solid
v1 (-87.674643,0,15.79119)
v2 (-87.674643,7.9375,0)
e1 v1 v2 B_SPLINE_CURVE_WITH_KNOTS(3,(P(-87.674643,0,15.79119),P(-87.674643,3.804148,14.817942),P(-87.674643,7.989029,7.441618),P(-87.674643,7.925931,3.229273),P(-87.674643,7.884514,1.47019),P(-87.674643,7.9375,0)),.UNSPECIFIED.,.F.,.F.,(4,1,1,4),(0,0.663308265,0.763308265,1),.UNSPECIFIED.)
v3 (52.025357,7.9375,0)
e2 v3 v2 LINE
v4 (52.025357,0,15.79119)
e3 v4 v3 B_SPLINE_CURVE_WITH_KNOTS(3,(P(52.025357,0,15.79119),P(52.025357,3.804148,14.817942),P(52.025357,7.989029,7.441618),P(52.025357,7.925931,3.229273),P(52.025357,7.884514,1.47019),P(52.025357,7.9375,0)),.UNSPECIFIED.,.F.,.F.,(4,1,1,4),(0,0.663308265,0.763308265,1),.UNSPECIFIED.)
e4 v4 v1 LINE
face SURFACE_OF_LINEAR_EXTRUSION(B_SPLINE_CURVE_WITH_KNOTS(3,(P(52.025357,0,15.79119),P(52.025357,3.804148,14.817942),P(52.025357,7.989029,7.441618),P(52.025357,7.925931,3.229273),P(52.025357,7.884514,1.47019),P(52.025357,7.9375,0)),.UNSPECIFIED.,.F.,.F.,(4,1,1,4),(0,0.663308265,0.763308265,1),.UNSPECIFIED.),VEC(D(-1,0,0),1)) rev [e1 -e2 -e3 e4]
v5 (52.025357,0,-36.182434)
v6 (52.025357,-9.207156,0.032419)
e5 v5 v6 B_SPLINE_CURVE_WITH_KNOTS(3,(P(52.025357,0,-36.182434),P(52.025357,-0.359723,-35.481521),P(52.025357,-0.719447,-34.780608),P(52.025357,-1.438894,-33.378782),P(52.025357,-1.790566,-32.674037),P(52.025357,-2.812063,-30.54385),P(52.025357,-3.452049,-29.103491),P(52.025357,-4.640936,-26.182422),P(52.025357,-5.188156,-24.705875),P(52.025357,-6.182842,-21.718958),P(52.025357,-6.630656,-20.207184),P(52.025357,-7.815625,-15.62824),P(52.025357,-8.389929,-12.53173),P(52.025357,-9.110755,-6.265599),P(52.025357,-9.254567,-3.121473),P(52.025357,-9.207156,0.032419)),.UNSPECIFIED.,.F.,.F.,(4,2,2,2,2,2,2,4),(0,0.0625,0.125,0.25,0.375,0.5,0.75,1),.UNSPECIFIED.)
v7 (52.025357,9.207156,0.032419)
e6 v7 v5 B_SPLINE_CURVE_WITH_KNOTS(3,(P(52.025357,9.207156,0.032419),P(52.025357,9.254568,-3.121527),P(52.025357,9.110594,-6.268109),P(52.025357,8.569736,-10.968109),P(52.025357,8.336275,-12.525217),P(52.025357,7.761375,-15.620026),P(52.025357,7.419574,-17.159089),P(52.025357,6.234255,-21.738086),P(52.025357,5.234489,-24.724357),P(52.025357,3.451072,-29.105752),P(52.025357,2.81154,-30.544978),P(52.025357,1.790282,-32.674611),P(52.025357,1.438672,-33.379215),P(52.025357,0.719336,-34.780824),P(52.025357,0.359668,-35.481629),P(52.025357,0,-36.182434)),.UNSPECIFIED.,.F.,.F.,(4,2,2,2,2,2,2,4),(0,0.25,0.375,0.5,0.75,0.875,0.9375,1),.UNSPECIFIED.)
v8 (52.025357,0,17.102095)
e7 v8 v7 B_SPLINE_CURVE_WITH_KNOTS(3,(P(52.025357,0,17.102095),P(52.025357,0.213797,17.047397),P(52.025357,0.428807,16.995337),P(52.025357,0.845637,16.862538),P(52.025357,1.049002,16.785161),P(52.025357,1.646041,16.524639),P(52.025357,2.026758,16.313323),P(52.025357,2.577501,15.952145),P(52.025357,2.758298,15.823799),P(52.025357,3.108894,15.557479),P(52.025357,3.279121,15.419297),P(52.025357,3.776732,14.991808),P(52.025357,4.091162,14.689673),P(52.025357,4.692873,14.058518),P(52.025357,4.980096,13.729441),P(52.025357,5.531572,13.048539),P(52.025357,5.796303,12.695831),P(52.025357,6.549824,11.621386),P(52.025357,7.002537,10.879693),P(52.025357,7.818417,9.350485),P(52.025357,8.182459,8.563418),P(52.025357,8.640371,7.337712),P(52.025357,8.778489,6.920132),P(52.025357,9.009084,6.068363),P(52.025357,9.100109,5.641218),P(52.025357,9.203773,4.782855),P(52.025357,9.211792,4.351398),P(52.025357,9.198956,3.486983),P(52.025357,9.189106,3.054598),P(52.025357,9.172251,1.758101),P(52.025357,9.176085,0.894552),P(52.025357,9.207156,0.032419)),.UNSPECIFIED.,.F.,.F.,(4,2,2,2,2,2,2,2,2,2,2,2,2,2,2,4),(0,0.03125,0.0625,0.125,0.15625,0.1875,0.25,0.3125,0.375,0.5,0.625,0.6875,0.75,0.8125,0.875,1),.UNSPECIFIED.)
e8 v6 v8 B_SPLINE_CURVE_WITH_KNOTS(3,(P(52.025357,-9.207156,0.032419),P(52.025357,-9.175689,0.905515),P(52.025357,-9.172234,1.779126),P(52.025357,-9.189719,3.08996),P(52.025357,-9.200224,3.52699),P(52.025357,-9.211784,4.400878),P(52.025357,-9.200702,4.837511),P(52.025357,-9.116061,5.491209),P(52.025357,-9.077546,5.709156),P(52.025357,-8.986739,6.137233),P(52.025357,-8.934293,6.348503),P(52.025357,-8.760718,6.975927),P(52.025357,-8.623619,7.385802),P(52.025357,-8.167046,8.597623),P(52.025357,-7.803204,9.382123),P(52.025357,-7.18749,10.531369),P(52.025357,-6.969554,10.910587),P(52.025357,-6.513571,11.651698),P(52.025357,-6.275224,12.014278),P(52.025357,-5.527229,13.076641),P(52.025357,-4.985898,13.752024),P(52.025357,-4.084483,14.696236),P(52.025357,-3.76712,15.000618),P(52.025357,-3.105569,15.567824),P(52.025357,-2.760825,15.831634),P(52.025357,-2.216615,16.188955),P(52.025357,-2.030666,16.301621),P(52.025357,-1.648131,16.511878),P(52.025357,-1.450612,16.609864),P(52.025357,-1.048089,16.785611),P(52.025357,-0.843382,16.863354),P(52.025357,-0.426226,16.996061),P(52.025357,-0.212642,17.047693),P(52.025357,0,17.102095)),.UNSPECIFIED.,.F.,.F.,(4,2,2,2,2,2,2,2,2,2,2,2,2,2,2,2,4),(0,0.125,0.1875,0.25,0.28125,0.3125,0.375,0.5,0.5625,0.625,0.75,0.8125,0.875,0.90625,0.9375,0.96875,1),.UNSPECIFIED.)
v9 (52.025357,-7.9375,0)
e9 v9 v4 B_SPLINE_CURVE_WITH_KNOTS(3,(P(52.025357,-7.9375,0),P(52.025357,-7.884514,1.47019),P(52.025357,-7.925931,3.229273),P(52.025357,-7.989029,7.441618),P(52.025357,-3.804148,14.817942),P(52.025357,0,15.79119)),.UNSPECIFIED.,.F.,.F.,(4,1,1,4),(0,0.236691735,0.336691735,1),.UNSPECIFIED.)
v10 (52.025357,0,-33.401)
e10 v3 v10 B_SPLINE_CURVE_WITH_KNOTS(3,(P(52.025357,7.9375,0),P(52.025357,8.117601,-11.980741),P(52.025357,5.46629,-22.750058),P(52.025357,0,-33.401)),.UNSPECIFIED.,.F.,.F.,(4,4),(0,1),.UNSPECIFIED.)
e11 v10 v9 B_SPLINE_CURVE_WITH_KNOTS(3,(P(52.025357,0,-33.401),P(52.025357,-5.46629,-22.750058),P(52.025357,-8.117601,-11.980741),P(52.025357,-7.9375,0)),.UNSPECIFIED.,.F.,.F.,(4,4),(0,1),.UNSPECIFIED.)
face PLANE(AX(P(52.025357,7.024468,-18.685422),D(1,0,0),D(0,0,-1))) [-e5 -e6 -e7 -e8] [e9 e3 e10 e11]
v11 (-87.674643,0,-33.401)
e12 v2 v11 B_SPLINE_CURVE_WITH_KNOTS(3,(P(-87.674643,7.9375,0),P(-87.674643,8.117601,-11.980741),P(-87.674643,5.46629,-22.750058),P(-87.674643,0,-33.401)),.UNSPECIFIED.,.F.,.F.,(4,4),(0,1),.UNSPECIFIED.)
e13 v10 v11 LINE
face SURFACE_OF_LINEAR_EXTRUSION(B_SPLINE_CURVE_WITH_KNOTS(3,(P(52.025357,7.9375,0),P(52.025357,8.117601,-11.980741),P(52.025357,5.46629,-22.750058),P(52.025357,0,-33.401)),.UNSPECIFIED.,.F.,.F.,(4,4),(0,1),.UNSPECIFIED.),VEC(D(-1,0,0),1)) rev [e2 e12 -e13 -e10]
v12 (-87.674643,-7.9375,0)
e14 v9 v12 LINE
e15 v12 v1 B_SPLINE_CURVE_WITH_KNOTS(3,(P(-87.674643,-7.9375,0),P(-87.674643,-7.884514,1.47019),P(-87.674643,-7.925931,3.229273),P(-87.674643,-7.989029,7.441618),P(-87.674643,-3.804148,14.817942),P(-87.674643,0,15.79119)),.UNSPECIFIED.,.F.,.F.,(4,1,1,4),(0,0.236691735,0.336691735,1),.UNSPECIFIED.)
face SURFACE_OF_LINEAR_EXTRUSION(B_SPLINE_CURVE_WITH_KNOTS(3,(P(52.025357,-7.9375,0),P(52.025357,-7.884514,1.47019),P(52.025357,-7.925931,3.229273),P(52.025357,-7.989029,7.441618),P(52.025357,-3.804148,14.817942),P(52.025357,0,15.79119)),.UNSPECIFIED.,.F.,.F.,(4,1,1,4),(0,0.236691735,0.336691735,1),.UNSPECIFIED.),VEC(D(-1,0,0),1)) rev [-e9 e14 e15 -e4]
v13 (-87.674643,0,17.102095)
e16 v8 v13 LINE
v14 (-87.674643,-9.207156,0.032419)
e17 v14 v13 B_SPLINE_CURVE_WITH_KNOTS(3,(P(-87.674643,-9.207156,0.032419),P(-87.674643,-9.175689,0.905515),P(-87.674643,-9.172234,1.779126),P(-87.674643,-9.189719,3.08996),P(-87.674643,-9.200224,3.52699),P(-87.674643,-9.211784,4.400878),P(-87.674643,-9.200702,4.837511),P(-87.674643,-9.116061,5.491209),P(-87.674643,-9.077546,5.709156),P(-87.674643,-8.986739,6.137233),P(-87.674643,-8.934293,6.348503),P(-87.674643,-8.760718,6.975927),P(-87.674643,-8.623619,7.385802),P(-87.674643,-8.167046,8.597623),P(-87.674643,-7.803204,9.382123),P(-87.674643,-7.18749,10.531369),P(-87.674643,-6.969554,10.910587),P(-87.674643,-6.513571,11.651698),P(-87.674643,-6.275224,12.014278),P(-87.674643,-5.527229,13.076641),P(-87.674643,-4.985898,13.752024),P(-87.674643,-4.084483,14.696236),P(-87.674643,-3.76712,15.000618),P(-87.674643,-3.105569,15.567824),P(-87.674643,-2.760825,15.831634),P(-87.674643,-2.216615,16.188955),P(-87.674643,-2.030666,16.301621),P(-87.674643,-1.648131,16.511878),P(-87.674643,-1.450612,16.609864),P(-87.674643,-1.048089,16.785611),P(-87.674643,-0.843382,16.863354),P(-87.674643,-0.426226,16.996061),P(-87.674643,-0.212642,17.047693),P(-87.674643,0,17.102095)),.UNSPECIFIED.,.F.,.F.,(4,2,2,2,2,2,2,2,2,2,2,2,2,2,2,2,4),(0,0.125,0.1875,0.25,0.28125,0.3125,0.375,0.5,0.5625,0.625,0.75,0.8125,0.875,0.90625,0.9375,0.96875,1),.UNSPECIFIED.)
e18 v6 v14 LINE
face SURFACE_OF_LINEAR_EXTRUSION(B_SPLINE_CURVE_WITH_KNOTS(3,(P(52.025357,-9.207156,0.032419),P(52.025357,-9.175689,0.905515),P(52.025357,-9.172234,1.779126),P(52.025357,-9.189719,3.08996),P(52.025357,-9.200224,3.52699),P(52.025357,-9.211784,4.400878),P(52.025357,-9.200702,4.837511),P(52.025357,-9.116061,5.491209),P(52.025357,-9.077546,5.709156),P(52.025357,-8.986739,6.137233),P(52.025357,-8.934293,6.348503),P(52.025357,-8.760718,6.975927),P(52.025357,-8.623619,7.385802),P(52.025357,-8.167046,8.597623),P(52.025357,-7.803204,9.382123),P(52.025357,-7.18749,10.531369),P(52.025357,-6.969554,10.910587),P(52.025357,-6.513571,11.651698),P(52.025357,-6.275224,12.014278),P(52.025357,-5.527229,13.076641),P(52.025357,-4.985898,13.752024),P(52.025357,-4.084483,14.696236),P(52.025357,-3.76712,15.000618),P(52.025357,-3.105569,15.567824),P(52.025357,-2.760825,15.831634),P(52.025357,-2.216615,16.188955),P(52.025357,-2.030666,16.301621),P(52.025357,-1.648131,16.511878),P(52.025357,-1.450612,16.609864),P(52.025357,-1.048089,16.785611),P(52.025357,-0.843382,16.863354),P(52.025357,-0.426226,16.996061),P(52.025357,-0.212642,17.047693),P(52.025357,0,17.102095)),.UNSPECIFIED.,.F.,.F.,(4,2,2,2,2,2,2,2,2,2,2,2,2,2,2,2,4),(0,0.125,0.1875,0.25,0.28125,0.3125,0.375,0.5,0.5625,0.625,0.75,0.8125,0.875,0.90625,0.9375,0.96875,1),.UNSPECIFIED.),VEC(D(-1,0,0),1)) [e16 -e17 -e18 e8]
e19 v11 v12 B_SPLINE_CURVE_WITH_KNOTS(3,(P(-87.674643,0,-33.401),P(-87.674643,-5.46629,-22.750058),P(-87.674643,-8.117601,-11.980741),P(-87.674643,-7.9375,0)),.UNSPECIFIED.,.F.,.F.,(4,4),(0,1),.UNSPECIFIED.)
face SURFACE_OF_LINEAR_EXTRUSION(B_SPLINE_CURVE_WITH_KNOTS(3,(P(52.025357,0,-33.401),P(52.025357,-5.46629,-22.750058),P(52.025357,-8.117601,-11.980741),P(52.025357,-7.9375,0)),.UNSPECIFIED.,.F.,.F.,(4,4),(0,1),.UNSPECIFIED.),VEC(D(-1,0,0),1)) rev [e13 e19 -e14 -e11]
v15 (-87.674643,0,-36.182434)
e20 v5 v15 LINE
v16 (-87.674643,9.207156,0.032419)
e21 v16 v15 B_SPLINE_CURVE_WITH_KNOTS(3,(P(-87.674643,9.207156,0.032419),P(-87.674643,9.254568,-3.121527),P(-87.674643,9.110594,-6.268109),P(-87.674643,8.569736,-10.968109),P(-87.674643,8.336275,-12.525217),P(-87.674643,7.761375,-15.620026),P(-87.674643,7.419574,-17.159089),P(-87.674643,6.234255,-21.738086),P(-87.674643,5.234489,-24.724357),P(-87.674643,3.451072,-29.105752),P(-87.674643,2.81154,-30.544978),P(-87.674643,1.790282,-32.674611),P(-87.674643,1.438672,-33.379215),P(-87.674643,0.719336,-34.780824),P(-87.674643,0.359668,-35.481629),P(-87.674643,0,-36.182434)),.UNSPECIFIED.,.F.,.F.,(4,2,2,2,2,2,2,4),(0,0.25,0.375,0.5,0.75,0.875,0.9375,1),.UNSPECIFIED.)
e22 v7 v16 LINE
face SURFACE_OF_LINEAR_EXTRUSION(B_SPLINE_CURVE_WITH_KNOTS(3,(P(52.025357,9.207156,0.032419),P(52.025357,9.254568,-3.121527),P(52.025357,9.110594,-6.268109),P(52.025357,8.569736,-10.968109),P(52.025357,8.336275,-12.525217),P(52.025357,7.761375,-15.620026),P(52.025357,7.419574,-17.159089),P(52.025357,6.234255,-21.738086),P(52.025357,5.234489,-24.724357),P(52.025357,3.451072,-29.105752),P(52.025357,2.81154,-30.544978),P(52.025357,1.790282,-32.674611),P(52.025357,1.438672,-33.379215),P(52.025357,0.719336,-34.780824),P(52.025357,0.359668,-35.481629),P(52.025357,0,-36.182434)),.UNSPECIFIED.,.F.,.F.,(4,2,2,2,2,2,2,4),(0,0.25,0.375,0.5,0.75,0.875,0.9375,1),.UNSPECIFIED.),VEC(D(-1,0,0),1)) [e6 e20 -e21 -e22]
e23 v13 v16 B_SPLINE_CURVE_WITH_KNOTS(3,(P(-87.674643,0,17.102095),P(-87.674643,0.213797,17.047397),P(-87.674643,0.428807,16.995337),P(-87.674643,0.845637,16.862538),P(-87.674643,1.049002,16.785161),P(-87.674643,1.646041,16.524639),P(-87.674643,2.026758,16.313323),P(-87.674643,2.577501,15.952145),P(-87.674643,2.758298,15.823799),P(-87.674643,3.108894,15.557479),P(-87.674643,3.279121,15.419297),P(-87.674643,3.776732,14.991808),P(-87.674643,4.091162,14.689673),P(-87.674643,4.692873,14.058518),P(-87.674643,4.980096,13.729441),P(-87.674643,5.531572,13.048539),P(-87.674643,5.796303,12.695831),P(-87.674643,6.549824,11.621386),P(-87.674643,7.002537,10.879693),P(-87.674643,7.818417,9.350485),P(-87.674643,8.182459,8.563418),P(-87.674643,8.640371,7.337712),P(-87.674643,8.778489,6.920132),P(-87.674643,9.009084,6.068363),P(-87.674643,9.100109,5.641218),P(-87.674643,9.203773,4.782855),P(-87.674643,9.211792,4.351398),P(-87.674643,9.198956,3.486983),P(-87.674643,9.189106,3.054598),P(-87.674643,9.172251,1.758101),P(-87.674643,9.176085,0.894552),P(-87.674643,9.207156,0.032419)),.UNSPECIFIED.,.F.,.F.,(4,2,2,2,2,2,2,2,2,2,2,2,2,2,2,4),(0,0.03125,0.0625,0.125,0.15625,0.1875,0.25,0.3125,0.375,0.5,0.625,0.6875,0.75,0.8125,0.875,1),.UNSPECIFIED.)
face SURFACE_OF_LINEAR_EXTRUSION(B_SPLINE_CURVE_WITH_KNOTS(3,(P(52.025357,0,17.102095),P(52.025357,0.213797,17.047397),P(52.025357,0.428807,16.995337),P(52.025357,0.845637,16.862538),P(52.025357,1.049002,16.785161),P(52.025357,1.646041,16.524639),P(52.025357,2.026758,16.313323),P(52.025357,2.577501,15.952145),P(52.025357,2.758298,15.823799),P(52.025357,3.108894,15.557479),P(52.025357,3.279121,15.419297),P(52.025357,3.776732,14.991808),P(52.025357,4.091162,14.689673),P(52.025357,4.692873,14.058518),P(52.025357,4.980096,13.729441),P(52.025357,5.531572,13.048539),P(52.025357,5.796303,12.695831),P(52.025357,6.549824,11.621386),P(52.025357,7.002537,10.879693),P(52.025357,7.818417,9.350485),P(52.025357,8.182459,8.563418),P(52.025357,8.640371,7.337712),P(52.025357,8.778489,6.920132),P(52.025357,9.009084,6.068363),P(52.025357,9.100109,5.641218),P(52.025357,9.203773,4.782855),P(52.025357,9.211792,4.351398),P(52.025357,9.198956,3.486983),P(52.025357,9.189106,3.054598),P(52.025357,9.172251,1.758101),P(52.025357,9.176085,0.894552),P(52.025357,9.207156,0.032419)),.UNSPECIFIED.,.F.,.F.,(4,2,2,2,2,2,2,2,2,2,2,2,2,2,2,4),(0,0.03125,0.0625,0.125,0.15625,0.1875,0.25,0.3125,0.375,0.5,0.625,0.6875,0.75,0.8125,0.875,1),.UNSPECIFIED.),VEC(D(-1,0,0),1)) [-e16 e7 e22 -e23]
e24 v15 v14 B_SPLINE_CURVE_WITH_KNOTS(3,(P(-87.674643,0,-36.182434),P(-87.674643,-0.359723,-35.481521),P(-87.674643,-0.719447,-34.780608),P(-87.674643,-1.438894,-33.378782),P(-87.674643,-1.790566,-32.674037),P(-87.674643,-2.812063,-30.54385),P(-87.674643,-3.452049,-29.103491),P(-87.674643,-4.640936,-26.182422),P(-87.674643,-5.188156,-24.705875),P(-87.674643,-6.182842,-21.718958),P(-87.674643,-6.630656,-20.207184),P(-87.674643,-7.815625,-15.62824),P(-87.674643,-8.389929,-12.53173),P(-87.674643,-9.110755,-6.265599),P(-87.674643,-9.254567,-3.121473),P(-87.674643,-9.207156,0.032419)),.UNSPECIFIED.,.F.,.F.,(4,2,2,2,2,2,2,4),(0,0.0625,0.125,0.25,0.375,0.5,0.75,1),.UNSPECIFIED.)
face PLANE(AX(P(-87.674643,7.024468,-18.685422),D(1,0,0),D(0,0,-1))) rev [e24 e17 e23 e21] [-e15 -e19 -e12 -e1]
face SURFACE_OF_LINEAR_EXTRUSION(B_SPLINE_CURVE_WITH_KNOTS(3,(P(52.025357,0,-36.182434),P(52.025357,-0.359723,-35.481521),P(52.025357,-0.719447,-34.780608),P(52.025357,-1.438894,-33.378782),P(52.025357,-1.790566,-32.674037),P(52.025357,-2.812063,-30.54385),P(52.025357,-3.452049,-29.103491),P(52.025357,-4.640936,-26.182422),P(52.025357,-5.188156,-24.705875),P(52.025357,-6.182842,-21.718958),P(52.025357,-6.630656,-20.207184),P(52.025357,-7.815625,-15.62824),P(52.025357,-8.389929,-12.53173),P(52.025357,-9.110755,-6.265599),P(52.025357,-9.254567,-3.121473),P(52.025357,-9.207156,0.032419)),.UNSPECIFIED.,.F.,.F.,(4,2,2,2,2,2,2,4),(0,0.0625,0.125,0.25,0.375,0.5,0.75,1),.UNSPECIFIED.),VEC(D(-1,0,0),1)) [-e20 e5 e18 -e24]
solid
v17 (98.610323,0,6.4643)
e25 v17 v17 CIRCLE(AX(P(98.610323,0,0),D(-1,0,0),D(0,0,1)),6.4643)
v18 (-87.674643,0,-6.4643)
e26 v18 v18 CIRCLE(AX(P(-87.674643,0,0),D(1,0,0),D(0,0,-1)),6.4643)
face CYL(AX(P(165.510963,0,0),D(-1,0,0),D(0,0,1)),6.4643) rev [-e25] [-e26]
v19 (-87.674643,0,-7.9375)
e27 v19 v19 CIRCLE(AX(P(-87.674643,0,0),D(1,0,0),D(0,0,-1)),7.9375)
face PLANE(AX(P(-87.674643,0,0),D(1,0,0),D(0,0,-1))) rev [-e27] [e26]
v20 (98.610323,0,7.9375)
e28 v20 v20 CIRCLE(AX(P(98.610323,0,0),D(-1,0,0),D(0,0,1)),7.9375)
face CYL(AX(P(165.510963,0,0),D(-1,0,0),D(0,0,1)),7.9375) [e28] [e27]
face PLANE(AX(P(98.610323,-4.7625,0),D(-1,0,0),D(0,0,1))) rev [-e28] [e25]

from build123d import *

# Parameters (mm, degrees)
BOSS_EXTRUDE1_DEPTH      = 98.610323
BOSS_EXTRUDE1_DEPTH_BACK = 87.674643
SKETCH1_R                = 7.9375
SKETCH1_R_2              = 6.4643
EXTRUDE_THIN1_START      = -139.7
EXTRUDE_THIN1_DEPTH      = 139.7


# Read off the part's stored shape, not the designer's step: Extrude-Thin1
with BuildPart() as part:
    # Sketch1 → Boss-Extrude1 (new, two sides: drawn at the far end of the back side and taken through both)
    with BuildSketch(Plane(origin=(0, 0, 0), x_dir=(0, 0, -1), z_dir=(1, 0, 0)).offset(-BOSS_EXTRUDE1_DEPTH_BACK)):
        with Locations(Location((0, 0, 0), (0, 0, 180))):
            Circle(SKETCH1_R)
        with Locations(Location((0, 0, 0), (0, 0, 180))):
            Circle(SKETCH1_R_2, mode=Mode.SUBTRACT)
    extrude(amount=BOSS_EXTRUDE1_DEPTH + BOSS_EXTRUDE1_DEPTH_BACK)


with BuildPart() as body_2:
    # Extrude-Thin1 outline → Extrude-Thin1 (new body)
    with BuildSketch(Plane.ZY.offset(87.674642954).offset(EXTRUDE_THIN1_START)):
        with BuildLine():
            add(Edge.make_bspline(
                [(17.102094562, 0), (17.04739702, 0.213797016), (16.995336819, 0.42880706), (16.862538118, 0.845636753), (16.785160791, 1.049002351), (16.524638716, 1.646041309), (16.313322861, 2.026757553), (15.952145288, 2.577500677), (15.823799266, 2.758298236), (15.55747882, 3.108894312), (15.419296606, 3.279121061), (14.991807723, 3.776732023), (14.689672994, 4.091162254), (14.058517718, 4.692872976), (13.729440661, 4.980096404), (13.048538768, 5.531572182), (12.695830839, 5.79630298), (11.621386484, 6.549823619), (10.879692917, 7.002537116), (9.350485078, 7.81841744), (8.563418356, 8.182458905), (7.337712392, 8.640371405), (6.920131838, 8.778488758), (6.068362945, 9.009083778), (5.641217648, 9.100109427), (4.782855054, 9.20377314), (4.351397815, 9.211792234), (3.486983413, 9.198956322), (3.054597909, 9.189105956), (1.758100925, 9.172251023), (0.894552451, 9.176084553), (0.032418914, 9.207156149)],
                knots=[0, 0, 0, 0, 0.03125, 0.03125, 0.0625, 0.0625, 0.125, 0.125, 0.15625, 0.15625, 0.1875, 0.1875, 0.25, 0.25, 0.3125, 0.3125, 0.375, 0.375, 0.5, 0.5, 0.625, 0.625, 0.6875, 0.6875, 0.75, 0.75, 0.8125, 0.8125, 0.875, 0.875, 1, 1, 1, 1], degree=3))
            add(Edge.make_bspline(
                [(0.032418914, 9.207156149), (-3.121526951, 9.254567879), (-6.268108602, 9.110594057), (-10.968108502, 8.569736414), (-12.52521706, 8.336275013), (-15.620025789, 7.761375356), (-17.159089419, 7.419573925), (-21.738086481, 6.234254823), (-24.724357097, 5.234488958), (-29.105751606, 3.451071682), (-30.544977721, 2.811540258), (-32.674611159, 1.79028171), (-33.379214501, 1.438672145), (-34.780824408, 0.719336072), (-35.481629362, 0.359668036), (-36.182434315, 0)],
                knots=[0, 0, 0, 0, 0.25, 0.25, 0.375, 0.375, 0.5, 0.5, 0.75, 0.75, 0.875, 0.875, 0.9375, 0.9375, 1, 1, 1, 1], degree=3))
            add(Edge.make_bspline(
                [(-36.182434315, 0), (-35.481521346, -0.359723472), (-34.780608377, -0.719446944), (-33.378782439, -1.438893888), (-32.674037428, -1.790565857), (-30.54384954, -2.812063227), (-29.103490823, -3.452048995), (-26.182421908, -4.640936279), (-24.705875102, -5.18815569), (-21.718958236, -6.182841679), (-20.207183631, -6.630656344), (-15.628240433, -7.815624895), (-12.531730425, -8.389928975), (-6.265599348, -9.11075463), (-3.121472775, -9.254567065), (0.032418914, -9.207156149)],
                knots=[0, 0, 0, 0, 0.0625, 0.0625, 0.125, 0.125, 0.25, 0.25, 0.375, 0.375, 0.5, 0.5, 0.75, 0.75, 1, 1, 1, 1], degree=3))
            add(Edge.make_bspline(
                [(0.032418914, -9.207156149), (0.905514517, -9.175689476), (1.779125635, -9.172233827), (3.089959502, -9.189718729), (3.526990194, -9.200223759), (4.400877656, -9.211783508), (4.837511077, -9.200702397), (5.491209368, -9.116060671), (5.709156111, -9.077545633), (6.137233482, -8.98673913), (6.348502946, -8.934293247), (6.975926684, -8.760718275), (7.385801524, -8.623619453), (8.597622689, -8.167045839), (9.38212336, -7.803203601), (10.531369419, -7.187490205), (10.910587265, -6.969553739), (11.651698354, -6.513571235), (12.014278322, -6.275223658), (13.076641296, -5.527228859), (13.752024112, -4.98589787), (14.696235941, -4.084483233), (15.000618027, -3.767120438), (15.567824422, -3.105568901), (15.83163431, -2.760825125), (16.188955162, -2.216615083), (16.301620626, -2.030666021), (16.511878279, -1.648130786), (16.609863922, -1.450611941), (16.785610923, -1.048088593), (16.863353526, -0.843382437), (16.996060883, -0.426225712), (17.047692544, -0.212641899), (17.102094562, 0)],
                knots=[0, 0, 0, 0, 0.125, 0.125, 0.1875, 0.1875, 0.25, 0.25, 0.28125, 0.28125, 0.3125, 0.3125, 0.375, 0.375, 0.5, 0.5, 0.5625, 0.5625, 0.625, 0.625, 0.75, 0.75, 0.8125, 0.8125, 0.875, 0.875, 0.90625, 0.90625, 0.9375, 0.9375, 0.96875, 0.96875, 1, 1, 1, 1], degree=3))
        make_face()
        with BuildLine():
            add(Edge.make_bspline(
                [(0, 7.9375), (-11.980740822, 8.117600633), (-22.750058366, 5.466290217), (-33.401, 0)],
                knots=[0, 0, 0, 0, 1, 1, 1, 1], degree=3))
            add(Edge.make_bspline(
                [(15.791190362, 0), (14.817942328, 3.804147623), (7.441618018, 7.989029069), (3.229273207, 7.925930538), (1.470189631, 7.884513847), (0, 7.9375)],
                knots=[0, 0, 0, 0, 0.663308265, 0.763308265, 1, 1, 1, 1], degree=3))
            add(Edge.make_bspline(
                [(0, -7.9375), (1.470189631, -7.884513847), (3.229273207, -7.925930538), (7.441618018, -7.989029069), (14.817942328, -3.804147623), (15.791190362, 0)],
                knots=[0, 0, 0, 0, 0.236691735, 0.336691735, 1, 1, 1, 1], degree=3))
            add(Edge.make_bspline(
                [(-33.401, 0), (-22.750058366, -5.466290217), (-11.980740822, -8.117600633), (0, -7.9375)],
                knots=[0, 0, 0, 0, 1, 1, 1, 1], degree=3))
        make_face(mode=Mode.SUBTRACT)
    extrude(amount=EXTRUDE_THIN1_DEPTH)


solid = Compound([part.part, body_2.part])
